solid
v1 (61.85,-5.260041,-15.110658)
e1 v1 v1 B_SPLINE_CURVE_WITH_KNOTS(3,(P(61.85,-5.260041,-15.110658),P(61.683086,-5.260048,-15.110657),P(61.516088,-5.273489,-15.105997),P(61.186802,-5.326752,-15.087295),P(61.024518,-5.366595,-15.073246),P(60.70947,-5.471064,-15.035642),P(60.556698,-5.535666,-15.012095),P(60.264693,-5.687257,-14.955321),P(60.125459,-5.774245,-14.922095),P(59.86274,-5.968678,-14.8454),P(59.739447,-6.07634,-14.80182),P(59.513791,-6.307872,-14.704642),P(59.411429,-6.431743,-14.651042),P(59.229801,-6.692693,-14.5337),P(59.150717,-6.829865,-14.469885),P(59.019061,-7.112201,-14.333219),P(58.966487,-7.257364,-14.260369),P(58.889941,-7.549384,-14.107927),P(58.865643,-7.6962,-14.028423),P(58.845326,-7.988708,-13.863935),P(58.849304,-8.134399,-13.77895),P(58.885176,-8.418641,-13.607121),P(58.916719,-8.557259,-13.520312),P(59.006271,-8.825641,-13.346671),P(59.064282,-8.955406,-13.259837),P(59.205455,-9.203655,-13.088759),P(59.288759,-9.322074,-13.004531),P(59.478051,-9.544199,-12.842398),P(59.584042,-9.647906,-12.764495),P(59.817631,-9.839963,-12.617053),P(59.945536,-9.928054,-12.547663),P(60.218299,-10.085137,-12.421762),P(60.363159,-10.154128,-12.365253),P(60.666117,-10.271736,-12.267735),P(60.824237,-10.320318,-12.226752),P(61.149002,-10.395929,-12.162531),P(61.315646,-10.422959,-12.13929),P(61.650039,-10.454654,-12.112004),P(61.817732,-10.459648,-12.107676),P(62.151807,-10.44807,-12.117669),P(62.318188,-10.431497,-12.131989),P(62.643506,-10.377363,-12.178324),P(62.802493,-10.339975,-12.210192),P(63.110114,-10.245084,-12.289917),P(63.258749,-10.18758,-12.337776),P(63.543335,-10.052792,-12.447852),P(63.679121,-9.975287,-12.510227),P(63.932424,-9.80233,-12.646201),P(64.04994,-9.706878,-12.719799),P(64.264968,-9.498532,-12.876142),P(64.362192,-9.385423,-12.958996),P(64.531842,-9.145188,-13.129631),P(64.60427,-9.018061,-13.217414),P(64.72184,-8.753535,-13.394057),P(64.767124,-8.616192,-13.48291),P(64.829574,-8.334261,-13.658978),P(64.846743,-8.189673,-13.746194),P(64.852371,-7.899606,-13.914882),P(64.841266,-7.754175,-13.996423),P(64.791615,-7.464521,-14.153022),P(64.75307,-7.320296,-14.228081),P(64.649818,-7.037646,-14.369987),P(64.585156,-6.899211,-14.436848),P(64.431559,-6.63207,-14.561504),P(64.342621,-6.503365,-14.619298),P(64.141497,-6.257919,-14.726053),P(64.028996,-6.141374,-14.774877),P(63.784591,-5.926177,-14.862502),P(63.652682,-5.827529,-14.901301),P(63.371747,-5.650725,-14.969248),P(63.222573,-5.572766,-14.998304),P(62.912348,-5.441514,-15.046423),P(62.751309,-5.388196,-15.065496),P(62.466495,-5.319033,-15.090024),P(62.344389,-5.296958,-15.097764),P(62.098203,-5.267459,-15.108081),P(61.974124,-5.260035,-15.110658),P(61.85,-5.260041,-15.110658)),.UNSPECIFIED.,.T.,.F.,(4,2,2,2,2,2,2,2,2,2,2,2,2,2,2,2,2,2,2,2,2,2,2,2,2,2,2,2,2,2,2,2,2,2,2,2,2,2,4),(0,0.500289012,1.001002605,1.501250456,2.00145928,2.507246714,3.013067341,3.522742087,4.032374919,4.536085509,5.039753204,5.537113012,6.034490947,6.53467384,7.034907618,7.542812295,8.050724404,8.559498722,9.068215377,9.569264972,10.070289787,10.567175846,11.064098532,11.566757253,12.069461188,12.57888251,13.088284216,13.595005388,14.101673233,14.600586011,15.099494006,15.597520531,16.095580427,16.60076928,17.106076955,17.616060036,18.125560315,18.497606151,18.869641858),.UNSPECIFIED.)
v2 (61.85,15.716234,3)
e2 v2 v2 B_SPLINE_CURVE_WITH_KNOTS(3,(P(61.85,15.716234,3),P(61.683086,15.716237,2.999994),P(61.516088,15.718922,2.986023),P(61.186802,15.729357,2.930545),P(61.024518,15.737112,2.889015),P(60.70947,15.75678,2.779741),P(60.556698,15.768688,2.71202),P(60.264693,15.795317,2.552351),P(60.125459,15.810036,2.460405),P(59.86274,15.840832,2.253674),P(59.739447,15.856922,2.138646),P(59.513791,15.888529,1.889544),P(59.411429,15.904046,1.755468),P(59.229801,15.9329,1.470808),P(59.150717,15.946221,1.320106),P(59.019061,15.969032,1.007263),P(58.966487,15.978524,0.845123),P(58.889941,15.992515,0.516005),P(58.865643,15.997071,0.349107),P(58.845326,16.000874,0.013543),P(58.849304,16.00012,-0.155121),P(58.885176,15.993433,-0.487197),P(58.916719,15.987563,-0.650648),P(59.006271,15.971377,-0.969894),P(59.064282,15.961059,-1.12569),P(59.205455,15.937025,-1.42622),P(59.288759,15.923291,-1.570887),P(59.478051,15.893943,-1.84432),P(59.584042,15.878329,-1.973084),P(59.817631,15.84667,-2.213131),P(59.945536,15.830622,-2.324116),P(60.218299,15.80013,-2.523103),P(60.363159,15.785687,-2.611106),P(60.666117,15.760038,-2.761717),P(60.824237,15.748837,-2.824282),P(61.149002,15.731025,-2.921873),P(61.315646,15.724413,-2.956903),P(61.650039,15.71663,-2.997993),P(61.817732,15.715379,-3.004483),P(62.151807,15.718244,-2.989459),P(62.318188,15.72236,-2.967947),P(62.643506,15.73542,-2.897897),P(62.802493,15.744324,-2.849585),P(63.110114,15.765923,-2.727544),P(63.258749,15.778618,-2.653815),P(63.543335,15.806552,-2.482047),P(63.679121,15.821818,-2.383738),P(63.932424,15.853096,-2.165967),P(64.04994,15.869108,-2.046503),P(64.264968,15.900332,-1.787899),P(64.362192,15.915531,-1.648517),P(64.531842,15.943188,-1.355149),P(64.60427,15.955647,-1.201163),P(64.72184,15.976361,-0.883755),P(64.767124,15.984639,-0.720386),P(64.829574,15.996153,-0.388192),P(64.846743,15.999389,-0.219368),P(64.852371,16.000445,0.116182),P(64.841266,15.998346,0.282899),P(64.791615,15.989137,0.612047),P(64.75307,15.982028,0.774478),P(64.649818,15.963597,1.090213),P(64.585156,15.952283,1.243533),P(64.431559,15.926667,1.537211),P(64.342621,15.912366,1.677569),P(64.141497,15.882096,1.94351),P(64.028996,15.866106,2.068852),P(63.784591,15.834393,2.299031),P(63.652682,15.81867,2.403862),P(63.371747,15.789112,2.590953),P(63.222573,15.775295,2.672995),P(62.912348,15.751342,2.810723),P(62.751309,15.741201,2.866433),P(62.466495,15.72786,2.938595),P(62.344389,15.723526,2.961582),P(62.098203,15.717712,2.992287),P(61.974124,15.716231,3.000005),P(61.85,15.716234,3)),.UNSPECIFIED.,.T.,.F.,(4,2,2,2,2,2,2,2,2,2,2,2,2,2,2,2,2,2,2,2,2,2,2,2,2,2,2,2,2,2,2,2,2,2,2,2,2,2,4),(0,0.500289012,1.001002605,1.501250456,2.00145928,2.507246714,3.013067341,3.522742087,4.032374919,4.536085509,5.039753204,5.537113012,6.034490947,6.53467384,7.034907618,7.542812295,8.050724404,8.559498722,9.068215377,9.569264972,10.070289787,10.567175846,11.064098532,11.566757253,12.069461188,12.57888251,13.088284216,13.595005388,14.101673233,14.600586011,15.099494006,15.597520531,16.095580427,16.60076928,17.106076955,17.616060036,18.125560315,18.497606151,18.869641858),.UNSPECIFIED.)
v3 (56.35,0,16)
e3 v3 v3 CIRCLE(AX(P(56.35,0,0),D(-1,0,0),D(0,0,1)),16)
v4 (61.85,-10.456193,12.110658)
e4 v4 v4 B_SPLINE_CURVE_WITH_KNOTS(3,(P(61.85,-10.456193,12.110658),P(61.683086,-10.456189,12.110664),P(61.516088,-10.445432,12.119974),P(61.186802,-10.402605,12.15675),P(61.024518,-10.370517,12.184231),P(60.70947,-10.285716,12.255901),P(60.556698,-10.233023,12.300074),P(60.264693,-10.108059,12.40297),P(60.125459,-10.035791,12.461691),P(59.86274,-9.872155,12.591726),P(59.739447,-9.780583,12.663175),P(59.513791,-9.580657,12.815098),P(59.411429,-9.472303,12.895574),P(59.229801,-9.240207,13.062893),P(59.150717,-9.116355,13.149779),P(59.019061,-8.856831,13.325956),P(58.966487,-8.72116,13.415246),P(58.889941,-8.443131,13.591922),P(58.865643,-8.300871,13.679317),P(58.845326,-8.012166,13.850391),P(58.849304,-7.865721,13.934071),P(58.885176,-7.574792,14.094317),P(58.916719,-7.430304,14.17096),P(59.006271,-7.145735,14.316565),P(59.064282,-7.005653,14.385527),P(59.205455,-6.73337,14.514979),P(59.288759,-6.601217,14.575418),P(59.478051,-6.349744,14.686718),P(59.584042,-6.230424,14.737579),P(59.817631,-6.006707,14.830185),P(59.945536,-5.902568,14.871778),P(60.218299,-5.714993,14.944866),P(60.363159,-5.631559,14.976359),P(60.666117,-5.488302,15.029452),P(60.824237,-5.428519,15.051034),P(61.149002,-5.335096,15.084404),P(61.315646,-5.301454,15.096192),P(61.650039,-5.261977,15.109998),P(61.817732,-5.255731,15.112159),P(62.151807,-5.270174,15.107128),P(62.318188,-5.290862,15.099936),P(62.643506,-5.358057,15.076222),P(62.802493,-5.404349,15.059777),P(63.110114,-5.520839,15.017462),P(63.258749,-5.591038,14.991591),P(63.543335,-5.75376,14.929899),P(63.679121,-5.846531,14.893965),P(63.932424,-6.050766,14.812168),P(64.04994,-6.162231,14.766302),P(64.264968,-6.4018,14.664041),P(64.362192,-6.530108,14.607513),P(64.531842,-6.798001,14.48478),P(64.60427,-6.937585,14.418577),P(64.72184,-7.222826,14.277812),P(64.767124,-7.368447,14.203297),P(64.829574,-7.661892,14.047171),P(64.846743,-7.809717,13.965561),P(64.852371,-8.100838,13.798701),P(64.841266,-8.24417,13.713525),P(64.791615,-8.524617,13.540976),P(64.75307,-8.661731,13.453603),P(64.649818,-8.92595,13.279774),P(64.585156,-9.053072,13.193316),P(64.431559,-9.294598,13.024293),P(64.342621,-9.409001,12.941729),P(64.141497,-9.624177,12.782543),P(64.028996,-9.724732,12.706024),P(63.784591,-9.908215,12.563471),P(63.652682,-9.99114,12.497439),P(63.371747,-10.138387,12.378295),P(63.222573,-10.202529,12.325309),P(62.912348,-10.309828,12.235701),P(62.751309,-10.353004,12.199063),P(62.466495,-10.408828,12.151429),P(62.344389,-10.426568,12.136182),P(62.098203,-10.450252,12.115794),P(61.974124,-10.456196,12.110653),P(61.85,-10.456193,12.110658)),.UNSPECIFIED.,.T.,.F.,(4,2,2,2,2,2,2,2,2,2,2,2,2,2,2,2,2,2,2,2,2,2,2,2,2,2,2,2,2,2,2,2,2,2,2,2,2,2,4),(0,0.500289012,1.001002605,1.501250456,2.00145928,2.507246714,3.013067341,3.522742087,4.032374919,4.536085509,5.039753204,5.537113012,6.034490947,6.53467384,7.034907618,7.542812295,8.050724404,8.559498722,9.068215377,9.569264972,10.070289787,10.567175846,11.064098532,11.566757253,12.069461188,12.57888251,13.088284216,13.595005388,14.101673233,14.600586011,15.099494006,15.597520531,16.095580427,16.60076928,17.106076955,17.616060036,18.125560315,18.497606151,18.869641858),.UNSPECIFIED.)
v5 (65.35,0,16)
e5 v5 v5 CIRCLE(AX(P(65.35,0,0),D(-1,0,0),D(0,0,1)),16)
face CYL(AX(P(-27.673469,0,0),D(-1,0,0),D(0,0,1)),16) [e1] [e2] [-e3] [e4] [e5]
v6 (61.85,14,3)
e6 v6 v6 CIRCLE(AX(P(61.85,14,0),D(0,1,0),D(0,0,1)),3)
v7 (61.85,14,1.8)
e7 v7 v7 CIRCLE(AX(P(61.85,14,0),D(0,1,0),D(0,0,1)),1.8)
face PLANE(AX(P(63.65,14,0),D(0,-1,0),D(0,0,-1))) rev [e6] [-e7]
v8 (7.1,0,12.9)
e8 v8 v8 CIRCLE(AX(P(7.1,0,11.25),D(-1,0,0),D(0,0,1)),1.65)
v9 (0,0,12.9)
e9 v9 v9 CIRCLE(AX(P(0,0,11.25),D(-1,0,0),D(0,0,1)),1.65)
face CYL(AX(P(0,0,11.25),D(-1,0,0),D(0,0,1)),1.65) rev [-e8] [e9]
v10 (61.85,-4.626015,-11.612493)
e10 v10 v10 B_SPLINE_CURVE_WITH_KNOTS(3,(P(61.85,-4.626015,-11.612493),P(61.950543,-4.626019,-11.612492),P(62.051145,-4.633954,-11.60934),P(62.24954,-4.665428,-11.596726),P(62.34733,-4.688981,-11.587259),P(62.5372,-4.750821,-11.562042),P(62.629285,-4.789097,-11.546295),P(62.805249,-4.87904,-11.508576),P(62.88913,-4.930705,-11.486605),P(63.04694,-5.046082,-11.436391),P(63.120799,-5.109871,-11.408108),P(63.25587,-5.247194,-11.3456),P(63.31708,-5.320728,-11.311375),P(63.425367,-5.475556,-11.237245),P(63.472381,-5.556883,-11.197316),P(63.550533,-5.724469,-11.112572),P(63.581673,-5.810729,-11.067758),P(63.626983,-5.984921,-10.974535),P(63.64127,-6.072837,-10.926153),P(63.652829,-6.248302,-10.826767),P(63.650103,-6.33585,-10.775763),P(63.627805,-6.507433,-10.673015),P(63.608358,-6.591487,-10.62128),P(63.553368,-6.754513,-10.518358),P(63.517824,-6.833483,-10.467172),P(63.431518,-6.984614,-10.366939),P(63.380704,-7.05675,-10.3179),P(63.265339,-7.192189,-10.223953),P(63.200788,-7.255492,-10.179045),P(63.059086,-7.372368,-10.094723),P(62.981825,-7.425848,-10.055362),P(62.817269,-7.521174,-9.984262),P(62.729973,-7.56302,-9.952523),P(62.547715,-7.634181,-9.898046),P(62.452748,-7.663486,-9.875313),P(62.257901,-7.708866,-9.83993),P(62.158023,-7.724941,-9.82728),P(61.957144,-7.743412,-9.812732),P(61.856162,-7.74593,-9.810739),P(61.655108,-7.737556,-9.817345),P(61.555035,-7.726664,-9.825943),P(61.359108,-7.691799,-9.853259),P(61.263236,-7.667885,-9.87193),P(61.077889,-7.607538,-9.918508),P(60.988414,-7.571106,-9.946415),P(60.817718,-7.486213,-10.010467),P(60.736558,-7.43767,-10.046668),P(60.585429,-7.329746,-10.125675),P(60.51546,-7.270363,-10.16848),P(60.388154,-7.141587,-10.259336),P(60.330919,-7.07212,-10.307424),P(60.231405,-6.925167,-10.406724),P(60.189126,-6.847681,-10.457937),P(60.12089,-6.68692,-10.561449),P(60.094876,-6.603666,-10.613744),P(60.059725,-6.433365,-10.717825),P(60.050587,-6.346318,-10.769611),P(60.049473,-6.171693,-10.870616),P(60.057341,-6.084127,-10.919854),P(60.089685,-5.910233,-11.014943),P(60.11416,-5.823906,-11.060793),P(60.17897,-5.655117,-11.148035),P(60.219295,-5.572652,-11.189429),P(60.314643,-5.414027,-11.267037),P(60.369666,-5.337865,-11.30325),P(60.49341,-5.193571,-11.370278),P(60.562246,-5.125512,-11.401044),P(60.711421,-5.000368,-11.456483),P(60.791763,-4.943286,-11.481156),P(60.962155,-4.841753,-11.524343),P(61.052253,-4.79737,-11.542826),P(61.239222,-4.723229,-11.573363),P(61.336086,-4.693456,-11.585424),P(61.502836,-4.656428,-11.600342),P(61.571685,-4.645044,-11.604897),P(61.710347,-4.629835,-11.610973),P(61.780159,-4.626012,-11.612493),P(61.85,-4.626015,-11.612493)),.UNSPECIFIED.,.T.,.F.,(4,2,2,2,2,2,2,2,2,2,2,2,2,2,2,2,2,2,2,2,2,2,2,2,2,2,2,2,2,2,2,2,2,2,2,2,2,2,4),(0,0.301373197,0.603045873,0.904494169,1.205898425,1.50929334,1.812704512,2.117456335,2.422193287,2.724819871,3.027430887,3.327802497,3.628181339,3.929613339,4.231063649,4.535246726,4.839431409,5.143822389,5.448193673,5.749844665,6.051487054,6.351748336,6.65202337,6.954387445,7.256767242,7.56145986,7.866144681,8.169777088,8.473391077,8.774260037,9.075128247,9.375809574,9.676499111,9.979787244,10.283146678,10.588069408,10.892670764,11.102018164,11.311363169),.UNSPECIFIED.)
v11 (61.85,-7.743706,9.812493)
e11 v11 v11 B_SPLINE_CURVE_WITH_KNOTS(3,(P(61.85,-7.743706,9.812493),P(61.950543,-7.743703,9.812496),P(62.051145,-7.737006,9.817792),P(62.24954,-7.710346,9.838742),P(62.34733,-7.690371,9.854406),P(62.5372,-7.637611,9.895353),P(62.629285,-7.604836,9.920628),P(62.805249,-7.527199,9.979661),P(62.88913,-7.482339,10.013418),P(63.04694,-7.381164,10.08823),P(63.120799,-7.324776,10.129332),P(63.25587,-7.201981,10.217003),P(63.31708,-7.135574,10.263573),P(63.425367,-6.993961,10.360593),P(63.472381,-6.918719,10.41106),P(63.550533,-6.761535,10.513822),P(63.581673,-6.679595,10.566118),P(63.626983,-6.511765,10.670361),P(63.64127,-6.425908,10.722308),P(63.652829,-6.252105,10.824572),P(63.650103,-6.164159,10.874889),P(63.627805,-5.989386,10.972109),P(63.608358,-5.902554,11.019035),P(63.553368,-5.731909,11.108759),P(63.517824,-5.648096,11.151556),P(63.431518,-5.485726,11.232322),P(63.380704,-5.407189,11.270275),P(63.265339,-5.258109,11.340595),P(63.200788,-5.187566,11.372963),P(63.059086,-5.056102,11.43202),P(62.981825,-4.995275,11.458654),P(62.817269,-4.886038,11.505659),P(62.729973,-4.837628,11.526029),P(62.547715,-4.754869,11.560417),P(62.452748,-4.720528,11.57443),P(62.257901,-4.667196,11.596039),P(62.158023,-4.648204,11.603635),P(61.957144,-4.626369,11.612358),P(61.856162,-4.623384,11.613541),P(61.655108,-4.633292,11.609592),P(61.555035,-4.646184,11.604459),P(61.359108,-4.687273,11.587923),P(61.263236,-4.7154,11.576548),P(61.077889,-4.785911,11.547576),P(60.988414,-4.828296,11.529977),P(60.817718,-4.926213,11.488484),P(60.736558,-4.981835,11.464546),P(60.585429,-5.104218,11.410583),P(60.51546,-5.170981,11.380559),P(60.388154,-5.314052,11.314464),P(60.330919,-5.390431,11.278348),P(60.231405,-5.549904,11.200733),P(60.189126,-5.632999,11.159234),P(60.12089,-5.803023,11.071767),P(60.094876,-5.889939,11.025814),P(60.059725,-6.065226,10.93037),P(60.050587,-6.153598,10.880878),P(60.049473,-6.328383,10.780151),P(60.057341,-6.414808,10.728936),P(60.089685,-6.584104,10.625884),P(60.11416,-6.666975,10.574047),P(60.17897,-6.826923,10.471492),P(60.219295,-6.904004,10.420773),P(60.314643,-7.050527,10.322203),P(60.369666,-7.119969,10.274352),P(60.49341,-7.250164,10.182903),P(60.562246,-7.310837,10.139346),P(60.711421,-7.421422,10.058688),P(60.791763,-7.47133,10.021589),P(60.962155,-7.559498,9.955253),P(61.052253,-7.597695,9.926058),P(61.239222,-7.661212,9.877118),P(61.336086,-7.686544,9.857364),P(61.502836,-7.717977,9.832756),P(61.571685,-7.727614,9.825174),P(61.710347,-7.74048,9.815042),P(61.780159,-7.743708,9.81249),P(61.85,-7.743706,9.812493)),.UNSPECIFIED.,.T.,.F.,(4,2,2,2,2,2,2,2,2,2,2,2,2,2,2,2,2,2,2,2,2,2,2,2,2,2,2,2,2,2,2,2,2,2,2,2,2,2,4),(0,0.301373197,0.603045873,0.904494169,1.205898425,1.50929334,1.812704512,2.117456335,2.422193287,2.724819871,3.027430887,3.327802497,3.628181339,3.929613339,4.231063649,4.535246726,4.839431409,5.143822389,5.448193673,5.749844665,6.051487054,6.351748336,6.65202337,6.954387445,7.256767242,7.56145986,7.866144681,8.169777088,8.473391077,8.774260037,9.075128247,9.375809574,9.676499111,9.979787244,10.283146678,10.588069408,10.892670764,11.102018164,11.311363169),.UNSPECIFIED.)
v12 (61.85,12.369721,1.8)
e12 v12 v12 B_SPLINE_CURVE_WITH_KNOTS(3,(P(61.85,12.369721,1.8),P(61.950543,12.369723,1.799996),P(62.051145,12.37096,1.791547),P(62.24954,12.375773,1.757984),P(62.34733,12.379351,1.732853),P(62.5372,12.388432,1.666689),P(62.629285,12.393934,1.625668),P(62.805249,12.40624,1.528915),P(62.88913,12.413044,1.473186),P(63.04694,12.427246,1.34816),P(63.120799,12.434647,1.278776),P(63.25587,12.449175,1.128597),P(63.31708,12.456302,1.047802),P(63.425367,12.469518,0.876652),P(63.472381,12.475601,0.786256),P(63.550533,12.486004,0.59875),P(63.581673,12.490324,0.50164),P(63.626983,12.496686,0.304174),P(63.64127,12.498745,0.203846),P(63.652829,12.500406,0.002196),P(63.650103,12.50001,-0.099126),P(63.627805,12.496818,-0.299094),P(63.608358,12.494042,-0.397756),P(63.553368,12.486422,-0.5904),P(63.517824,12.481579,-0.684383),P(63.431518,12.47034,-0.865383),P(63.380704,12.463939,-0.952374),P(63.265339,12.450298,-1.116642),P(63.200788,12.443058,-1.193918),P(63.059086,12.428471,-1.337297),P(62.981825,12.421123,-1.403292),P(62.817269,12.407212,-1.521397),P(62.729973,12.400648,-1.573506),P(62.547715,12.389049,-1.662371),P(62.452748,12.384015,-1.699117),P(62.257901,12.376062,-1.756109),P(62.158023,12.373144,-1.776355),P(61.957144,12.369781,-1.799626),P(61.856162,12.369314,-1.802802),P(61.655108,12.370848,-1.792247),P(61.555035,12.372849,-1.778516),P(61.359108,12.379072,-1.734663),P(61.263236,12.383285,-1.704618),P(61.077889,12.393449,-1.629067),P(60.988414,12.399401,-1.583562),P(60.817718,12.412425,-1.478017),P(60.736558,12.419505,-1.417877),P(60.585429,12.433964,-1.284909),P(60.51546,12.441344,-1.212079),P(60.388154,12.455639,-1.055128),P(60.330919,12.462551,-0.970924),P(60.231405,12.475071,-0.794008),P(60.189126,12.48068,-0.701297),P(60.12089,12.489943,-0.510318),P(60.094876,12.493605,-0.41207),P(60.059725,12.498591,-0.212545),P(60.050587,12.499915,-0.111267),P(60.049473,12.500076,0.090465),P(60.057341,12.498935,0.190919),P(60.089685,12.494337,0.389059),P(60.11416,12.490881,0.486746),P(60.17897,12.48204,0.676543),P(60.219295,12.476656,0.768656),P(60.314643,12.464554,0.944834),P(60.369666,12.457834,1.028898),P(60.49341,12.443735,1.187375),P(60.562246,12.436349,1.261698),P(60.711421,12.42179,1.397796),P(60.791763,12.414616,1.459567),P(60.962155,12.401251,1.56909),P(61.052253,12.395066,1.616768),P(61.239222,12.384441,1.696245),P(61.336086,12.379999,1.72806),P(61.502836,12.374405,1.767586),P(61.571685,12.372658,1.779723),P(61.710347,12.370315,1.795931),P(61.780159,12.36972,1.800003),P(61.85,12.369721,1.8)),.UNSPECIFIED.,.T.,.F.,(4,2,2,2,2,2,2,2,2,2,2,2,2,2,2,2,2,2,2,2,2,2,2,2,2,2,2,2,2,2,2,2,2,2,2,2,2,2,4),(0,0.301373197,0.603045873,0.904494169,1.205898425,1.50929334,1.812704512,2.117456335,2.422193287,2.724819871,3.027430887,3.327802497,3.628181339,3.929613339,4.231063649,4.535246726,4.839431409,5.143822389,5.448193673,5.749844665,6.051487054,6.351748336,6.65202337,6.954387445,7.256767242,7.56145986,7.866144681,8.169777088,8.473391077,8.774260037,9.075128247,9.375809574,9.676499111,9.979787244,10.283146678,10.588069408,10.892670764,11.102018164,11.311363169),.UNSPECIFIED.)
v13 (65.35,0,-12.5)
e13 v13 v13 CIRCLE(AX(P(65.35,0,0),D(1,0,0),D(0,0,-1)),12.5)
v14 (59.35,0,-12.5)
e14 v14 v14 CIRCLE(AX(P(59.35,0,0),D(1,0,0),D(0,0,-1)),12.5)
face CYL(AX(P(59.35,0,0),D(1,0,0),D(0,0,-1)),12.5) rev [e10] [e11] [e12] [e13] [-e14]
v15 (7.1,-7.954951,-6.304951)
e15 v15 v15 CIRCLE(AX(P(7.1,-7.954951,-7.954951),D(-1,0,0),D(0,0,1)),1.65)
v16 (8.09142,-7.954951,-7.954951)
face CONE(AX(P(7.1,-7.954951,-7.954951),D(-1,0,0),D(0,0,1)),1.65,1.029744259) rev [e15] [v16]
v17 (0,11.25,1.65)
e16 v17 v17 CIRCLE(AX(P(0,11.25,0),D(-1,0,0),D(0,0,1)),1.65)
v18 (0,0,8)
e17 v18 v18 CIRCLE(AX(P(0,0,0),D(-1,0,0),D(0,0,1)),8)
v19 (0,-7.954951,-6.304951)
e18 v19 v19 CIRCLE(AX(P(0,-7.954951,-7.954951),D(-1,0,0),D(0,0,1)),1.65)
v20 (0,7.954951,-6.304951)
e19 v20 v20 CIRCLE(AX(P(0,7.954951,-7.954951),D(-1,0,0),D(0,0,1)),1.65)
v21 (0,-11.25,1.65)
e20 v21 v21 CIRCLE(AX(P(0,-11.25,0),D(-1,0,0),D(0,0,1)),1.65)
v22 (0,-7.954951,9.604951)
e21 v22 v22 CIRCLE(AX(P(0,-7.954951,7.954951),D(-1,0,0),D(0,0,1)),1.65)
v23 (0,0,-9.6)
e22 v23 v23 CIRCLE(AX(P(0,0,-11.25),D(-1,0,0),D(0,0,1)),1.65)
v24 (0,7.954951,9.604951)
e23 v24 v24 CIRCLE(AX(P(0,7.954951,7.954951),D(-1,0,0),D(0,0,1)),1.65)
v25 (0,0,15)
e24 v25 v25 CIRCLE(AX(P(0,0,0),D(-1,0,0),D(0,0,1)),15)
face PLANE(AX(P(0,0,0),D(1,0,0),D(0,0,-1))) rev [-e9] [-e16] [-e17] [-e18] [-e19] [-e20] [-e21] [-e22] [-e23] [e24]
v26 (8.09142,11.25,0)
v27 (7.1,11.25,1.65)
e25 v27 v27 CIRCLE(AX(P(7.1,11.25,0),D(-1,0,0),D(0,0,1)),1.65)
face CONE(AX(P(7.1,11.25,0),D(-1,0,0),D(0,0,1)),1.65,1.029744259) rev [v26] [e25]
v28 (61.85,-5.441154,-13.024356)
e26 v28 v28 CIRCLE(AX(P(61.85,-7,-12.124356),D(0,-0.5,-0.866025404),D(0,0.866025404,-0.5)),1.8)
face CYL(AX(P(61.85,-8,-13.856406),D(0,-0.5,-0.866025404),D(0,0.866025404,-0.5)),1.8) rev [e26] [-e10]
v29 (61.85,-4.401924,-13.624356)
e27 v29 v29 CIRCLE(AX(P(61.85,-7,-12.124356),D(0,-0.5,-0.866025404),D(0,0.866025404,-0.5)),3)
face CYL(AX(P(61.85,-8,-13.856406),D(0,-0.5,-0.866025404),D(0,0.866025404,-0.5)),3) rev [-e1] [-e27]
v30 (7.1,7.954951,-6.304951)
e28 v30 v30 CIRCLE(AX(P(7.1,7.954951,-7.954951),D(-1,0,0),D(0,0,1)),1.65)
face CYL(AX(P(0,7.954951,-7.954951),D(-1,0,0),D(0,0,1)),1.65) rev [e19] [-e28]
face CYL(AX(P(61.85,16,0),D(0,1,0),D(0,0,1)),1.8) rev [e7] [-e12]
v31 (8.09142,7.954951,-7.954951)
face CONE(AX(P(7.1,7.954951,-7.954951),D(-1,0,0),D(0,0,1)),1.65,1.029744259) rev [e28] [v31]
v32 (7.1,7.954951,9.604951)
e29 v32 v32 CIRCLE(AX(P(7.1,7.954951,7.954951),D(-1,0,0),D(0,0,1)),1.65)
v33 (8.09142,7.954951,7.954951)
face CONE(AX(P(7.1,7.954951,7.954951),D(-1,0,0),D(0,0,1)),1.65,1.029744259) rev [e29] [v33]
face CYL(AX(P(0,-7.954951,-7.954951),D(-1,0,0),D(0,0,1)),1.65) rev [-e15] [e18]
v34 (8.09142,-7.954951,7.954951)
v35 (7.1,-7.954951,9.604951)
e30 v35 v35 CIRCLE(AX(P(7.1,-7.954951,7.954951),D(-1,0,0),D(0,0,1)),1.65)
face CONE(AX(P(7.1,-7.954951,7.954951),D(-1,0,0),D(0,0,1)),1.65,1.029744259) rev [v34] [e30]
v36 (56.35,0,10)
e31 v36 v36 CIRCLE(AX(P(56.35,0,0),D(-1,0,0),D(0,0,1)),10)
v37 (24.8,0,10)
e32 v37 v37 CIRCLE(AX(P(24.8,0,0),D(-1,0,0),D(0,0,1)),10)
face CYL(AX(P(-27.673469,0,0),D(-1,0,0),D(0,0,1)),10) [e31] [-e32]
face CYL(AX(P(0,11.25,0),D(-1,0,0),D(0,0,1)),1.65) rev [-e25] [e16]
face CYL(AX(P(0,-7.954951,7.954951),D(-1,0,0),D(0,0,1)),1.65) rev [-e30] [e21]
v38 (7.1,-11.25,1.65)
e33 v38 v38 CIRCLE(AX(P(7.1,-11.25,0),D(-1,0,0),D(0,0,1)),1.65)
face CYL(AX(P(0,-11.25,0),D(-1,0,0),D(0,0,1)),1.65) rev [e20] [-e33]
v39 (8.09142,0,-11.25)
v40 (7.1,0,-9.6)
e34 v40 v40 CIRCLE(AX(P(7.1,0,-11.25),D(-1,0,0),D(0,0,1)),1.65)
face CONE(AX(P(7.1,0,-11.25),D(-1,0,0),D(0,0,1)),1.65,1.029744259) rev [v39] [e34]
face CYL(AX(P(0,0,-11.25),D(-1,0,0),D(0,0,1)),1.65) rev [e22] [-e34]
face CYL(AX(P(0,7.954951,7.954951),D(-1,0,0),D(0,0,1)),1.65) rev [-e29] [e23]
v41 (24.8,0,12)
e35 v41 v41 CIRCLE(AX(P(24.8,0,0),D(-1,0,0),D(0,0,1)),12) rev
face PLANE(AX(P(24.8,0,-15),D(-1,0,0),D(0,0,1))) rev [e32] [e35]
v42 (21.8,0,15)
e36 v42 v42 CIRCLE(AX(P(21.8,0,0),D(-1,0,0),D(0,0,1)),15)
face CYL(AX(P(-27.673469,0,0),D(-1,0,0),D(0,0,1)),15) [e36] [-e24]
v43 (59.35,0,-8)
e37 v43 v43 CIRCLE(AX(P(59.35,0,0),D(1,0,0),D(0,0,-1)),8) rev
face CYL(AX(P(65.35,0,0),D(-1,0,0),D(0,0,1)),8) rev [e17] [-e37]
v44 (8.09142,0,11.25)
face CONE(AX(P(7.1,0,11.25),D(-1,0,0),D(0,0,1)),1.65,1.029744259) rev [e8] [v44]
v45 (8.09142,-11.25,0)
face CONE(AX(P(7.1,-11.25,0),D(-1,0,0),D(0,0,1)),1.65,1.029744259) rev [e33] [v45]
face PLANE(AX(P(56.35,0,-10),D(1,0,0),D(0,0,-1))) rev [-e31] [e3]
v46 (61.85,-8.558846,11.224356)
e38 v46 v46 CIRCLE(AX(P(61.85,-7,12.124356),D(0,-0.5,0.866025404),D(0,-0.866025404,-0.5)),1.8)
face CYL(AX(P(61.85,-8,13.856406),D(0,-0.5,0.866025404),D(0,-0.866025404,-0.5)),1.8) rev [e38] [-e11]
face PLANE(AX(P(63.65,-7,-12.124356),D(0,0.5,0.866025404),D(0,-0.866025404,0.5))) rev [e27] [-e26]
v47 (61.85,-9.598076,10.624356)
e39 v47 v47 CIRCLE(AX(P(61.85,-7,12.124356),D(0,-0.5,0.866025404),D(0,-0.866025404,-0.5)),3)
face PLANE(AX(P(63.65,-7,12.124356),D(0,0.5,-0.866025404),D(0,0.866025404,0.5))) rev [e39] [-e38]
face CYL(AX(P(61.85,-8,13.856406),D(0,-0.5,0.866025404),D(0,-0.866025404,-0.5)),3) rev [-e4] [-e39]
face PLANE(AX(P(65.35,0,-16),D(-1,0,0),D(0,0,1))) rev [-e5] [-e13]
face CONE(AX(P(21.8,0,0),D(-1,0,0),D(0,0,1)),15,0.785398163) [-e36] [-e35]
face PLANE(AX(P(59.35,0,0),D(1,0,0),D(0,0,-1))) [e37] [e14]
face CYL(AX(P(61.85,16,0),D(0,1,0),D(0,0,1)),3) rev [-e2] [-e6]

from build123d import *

# Parameters (mm, degrees)
SKETCH_2_R               = 8
CUT_EXTRUDE_1_DEPTH      = 70.156507286
SKETCH_5_R               = 12.5
CUT_EXTRUDE_2_DEPTH      = 6
CHAMFER_1_SIZE           = 3
PATTERN_CIRCULAR_3_COUNT = 8
PATTERN_CIRCULAR_4_COUNT = 3


# Read off the part's stored shape, not the designer's step: 打孔尺寸(%根据)内六角圆柱头螺钉的类型1
with BuildPart() as part:
    # 草图1 → 旋转1 (revolve)
    with BuildSketch(Plane(origin=(0, 0, 0), x_dir=(1, 0, 0), z_dir=(0, 1, 0)), mode=Mode.PRIVATE) as revolve_1_sk:
        Polygon((0, 0), (0, 15), (24.8, 15), (24.8, 10), (56.35, 10), (56.35, 16), (65.35, 16), (65.35, 0), align=None)
    revolve(revolve_1_sk.sketch.rotate(Axis((-27.673469388, 0, 0), (1, 0, 0)), 180), axis=Axis((-27.673469388, 0, 0), (1, 0, 0)))

    # 草图2 → 切除-拉伸1 (cut, through all)
    with BuildSketch(Plane.ZY):
        Circle(SKETCH_2_R)
    extrude(amount=-CUT_EXTRUDE_1_DEPTH, mode=Mode.SUBTRACT)

    # 草图5 → 切除-拉伸2 (cut)
    with BuildSketch(Plane(origin=(65.35, 0, 0), x_dir=(0, 0, -1), z_dir=(1, 0, 0))):
        Circle(SKETCH_5_R)
    extrude(amount=-CUT_EXTRUDE_2_DEPTH, mode=Mode.SUBTRACT)

    # 倒角1
    chamfer_1_edges = [part.edges().sort_by_distance(p)[0] for p in [
        (24.8, 0, -15),
    ]]
    chamfer(chamfer_1_edges, length=CHAMFER_1_SIZE)

    # 草图11 → M4 螺纹孔1 (revolve, cut)
    with BuildSketch(Plane.ZX.offset(11.25)):
        Polygon((0, 0), (0, 8.091420021), (1.65, 7.1), (1.65, 0), align=None)
    hole_wizard_m4_1 = revolve(axis=Axis((-6.35, 11.25, 0), (1, 0, 0)), mode=Mode.SUBTRACT)

    # 阵列(圆周)3: M4 螺纹孔1 ×8 about axis
    pattern_circular_3_axis = Axis((0, 0, 0), (1, 0, 0))
    for i in range(1, PATTERN_CIRCULAR_3_COUNT):
        add(hole_wizard_m4_1.rotate(pattern_circular_3_axis, i * 360 / PATTERN_CIRCULAR_3_COUNT), mode=Mode.SUBTRACT)

    # 打孔尺寸(%根据)内六角圆柱头螺钉的类型1 outline → 打孔尺寸(%根据)内六角圆柱头螺钉的类型1 (revolve, cut)
    with BuildSketch(Plane(origin=(61.85, 0, 0), x_dir=(1, 0, 0), z_dir=(0, 0, 1))):
        Polygon((1.8, 14), (3, 14), (3, 16.000041716), (0, 16.000041716), (0, 12.369650157), (1.8, 12.369650157), align=None)
    hole_wizard_1 = revolve(axis=Axis((61.85, 0, 0), (0, 1, 0)), mode=Mode.SUBTRACT)

    # 阵列(圆周)4: 打孔尺寸(%根据)内六角圆柱头螺钉的类型1 ×3 about axis
    pattern_circular_4_axis = Axis((0, 0, 0), (1, 0, 0))
    for i in range(1, PATTERN_CIRCULAR_4_COUNT):
        add(hole_wizard_1.rotate(pattern_circular_4_axis, i * 360 / PATTERN_CIRCULAR_4_COUNT), mode=Mode.SUBTRACT)


solid = part.part
